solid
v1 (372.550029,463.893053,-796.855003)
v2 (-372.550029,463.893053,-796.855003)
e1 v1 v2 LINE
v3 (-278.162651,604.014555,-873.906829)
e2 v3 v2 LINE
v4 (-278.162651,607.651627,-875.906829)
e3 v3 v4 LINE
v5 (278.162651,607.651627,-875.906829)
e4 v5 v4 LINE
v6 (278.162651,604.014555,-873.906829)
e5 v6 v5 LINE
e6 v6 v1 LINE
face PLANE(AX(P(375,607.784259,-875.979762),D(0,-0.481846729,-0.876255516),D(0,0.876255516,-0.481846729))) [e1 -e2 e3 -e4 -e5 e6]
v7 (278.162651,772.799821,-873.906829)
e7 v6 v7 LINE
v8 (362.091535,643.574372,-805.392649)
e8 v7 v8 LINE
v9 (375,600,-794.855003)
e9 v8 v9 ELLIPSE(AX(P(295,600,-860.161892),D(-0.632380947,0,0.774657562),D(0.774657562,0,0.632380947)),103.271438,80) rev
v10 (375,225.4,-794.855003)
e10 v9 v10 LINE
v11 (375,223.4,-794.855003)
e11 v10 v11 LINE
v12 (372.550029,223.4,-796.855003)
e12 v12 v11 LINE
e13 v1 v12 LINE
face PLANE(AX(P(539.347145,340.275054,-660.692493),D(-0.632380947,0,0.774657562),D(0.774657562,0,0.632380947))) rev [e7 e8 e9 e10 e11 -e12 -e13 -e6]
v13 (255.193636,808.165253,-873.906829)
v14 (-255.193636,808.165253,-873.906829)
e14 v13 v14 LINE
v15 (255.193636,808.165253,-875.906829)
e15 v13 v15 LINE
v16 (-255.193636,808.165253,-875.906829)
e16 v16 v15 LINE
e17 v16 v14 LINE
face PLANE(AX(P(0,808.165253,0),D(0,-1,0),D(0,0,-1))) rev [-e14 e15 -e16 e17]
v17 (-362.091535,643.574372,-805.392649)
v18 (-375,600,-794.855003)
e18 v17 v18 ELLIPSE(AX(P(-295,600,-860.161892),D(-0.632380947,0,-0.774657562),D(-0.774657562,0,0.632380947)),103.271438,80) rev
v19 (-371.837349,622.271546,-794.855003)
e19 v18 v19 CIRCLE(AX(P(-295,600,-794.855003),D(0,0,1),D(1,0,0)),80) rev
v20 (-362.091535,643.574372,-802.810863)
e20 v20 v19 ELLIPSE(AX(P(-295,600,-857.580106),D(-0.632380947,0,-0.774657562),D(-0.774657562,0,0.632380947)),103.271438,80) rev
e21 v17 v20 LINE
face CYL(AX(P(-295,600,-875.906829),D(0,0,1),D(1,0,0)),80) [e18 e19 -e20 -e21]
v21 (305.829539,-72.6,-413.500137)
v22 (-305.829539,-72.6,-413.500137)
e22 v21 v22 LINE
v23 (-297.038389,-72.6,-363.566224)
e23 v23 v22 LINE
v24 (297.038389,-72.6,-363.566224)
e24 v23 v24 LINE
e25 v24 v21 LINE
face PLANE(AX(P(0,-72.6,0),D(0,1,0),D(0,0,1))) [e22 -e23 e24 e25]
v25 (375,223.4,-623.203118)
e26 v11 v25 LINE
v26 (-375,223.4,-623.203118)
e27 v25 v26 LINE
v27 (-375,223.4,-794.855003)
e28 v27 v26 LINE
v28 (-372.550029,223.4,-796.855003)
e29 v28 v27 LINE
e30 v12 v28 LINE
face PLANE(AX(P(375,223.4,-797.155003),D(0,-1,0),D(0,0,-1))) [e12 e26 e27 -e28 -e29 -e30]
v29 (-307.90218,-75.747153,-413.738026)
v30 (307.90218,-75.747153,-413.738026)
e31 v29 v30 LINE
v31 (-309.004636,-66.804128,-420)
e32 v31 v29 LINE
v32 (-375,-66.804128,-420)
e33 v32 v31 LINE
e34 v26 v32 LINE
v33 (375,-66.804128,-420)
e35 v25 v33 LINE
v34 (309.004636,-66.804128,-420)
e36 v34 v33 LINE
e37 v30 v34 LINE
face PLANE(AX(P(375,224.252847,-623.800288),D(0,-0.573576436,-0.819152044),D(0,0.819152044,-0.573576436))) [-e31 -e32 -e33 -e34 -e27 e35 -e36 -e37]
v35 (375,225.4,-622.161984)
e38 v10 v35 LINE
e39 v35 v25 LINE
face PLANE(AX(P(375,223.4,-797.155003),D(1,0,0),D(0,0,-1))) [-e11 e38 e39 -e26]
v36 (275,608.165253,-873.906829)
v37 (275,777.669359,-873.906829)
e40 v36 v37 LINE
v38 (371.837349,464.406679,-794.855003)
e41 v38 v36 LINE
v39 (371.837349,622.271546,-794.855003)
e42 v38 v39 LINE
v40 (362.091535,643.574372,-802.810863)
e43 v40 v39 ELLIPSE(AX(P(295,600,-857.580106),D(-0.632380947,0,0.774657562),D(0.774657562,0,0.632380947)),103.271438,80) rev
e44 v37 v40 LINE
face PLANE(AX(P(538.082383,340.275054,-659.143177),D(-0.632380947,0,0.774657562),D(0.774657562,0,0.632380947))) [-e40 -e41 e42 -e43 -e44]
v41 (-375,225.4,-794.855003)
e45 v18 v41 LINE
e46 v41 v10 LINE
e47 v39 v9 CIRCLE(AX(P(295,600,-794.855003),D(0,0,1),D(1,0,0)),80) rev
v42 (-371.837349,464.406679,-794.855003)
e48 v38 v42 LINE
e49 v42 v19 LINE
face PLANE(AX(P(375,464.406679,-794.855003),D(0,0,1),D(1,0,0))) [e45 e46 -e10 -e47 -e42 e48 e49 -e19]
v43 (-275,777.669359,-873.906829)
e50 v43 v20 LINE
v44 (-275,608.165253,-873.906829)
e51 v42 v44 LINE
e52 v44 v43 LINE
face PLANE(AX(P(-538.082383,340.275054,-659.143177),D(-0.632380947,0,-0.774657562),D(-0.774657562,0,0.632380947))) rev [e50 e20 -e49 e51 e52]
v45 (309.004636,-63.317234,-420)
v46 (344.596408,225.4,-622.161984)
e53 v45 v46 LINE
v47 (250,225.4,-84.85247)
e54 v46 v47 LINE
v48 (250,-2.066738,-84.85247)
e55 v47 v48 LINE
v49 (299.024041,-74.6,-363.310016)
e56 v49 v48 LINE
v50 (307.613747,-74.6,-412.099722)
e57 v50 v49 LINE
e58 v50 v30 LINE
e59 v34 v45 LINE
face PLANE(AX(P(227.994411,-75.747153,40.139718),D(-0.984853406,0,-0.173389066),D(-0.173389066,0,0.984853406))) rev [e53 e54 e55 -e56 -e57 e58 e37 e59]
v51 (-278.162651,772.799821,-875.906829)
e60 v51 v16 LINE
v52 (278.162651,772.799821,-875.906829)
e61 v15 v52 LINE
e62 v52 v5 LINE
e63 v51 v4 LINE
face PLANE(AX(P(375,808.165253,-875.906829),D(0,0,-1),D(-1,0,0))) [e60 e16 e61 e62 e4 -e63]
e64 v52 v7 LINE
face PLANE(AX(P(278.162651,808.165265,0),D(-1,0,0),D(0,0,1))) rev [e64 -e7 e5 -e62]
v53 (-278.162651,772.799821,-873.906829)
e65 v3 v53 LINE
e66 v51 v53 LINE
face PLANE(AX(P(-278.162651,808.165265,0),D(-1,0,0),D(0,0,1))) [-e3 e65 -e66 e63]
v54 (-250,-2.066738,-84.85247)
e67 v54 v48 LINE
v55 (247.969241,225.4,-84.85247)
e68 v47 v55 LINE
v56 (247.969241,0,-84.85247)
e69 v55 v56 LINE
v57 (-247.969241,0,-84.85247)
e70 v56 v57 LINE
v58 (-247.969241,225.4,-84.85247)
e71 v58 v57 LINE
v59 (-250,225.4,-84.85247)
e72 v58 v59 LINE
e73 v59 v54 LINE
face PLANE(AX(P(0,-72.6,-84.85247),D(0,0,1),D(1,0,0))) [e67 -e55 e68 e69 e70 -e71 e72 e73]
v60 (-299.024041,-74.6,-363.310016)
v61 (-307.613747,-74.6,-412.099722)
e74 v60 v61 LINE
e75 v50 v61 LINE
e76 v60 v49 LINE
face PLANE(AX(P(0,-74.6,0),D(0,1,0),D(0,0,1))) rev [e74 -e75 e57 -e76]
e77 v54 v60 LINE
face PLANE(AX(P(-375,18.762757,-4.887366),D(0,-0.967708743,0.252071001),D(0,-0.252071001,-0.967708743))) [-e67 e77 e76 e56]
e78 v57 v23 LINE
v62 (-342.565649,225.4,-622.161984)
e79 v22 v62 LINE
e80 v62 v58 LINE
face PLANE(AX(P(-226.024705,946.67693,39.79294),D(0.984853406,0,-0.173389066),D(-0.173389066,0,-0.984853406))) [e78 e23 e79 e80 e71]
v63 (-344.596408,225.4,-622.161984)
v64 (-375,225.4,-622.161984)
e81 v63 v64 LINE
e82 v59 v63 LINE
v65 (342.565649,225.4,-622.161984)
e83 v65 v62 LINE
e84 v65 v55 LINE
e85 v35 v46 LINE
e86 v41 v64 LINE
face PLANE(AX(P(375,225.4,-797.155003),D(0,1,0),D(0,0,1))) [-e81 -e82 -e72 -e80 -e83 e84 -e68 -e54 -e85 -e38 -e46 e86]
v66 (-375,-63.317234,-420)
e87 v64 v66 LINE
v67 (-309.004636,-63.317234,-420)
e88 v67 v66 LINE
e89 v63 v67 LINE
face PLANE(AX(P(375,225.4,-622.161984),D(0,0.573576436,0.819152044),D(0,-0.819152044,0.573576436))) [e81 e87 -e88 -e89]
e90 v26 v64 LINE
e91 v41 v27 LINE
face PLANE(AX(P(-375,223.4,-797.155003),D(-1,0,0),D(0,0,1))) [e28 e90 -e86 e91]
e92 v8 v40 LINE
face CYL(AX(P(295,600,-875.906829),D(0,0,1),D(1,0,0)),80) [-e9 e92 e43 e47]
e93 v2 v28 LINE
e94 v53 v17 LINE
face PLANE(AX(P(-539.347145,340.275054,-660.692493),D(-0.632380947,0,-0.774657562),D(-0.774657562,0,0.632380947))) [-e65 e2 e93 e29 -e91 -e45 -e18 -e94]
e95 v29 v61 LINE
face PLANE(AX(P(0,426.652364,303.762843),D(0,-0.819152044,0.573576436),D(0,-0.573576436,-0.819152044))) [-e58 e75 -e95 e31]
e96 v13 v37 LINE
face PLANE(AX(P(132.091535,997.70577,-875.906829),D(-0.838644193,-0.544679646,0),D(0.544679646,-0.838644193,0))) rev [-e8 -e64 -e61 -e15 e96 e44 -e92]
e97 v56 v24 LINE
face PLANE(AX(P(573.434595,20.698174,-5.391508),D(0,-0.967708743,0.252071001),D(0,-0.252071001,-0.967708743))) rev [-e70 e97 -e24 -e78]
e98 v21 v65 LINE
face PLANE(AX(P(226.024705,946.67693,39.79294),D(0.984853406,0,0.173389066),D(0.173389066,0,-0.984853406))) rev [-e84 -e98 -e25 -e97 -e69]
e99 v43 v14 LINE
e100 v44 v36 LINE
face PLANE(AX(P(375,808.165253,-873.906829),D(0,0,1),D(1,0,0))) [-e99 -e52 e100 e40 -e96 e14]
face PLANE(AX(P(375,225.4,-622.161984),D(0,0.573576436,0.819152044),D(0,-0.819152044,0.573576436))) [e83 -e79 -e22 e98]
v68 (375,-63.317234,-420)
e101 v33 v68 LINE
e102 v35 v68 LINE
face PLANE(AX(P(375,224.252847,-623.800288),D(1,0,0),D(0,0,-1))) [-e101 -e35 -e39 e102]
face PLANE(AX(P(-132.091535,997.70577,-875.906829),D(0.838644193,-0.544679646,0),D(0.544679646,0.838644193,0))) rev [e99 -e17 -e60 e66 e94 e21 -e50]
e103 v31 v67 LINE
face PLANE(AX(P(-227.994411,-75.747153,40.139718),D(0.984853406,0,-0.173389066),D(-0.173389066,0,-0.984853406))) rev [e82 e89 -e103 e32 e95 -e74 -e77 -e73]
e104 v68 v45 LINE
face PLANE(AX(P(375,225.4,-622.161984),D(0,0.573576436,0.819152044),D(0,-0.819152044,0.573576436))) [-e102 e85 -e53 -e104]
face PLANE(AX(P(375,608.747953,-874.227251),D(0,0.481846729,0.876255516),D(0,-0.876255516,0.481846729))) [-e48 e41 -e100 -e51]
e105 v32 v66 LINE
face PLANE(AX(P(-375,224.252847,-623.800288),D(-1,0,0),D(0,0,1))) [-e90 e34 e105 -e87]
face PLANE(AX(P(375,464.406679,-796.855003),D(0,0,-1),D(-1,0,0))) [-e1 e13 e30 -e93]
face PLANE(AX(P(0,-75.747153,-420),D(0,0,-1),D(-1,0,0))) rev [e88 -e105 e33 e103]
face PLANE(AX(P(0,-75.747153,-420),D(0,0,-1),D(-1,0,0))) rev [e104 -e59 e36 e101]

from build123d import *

# Parameters (mm, degrees)
SKETCH2_W                        = 750
SKETCH2_H                        = 2
CUT_EXTRUDE1_START               = -75.747152873
CUT_EXTRUDE1_DEPTH               = 12.429918895
BOSS_EXTRUDE8_DEPTH              = 2
BOSS_EXTRUDE9_REACH              = 1300.889
CUT_EXTRUDE2_DEPTH               = 1250.387389222
CUT_EXTRUDE2_DEPTH_BACK          = 1250.387389222
BOSS_EXTRUDE11_REACH             = 1244.792
CUT_EXTRUDE4_DEPTH               = 1243.792388557
CUT_EXTRUDE4_DEPTH_BACK          = 1243.792388557
SKETCH9_5_W                      = 96.83734937
SKETCH9_5_H                      = 2
CUT_EXTRUDE5_DEPTH               = 1250.387389222
CUT_EXTRUDE5_DEPTH_BACK          = 1250.387389222
BOSS_EXTRUDE12_REACH             = 1251.387
BOSS_EXTRUDE12_DIRECTION_2_REACH = 1251.387
CUT_EXTRUDE6_DEPTH               = 1250.387389222


# Read off the part's stored shape, not the designer's step: Cut-Extrude1
with BuildPart() as part:
    # Sweep1: sweep along a path in Sketch1
    with BuildLine(Plane(origin=(0, 0, 0), x_dir=(0, 0, -1), z_dir=(1, 0, 0))) as sweep1_path:
        Line((412.09972218, -74.6), (622.161983643, 225.4))
        Line((622.161983643, 225.4), (794.855002782, 225.4))
        Line((794.855002782, 225.4), (794.855002782, 464.406679147))
        Line((794.855002782, 464.406679147), (873.906828676, 608.165252796))
        Line((873.906828676, 608.165252796), (873.906828676, 808.165252796))
    # Sketch2 → Sweep1 (sweep)
    with BuildSketch(Plane(origin=(0, 808.165252796, -873.906828676), x_dir=(-1, 0, 0), z_dir=(0, -1, 0))):
        with Locations((0, 1)):
            Rectangle(SKETCH2_W, SKETCH2_H)
    sweep(path=sweep1_path.line, transition=Transition.RIGHT)

    # Cut-Extrude1 outline → Cut-Extrude1 (cut)
    with BuildSketch(Plane(origin=(0, 0, 0), x_dir=(1, 0, 0), z_dir=(0, 1, 0)).offset(CUT_EXTRUDE1_START)):
        Polygon((309.004636298, 420), (250, 84.852470497), (375, 84.852470497), (375, 420), align=None)
        Polygon((-375, 84.852470497), (-250, 84.852470497), (-309.004636298, 420), (-375, 420), align=None)
    extrude(amount=CUT_EXTRUDE1_DEPTH, mode=Mode.SUBTRACT)

    # Sketch5 → Boss-Extrude8 (add)
    with BuildSketch(Plane(origin=(0, -74.6, 0), x_dir=(1, 0, 0), z_dir=(0, 1, 0))):
        Polygon((250, 84.852470497), (307.902180066, 413.738026268), (-307.902180066, 413.738026268), (-250, 84.852470497), align=None)
    extrude(amount=BOSS_EXTRUDE8_DEPTH)

    # Boss-Extrude9: up to this face of the body (flat: up to its plane)
    boss_extrude9_end = Plane(part.part.faces().sort_by_distance((0, 225.4, -708.508493212))[0])
    # Sketch7 → Boss-Extrude9 (add, up to the picked face)
    with BuildSketch(Plane(origin=(0, -74.6, 0), x_dir=(1, 0, 0), z_dir=(0, 1, 0)), mode=Mode.PRIVATE) as boss_extrude9_sk1:
        Polygon((247.969240917, 84.852470497), (250, 84.852470497), (375, 794.855002782), (372.969240917, 794.855002782), align=None)
    boss_extrude9_tool1 = split(extrude(boss_extrude9_sk1.sketch, amount=BOSS_EXTRUDE9_REACH, mode=Mode.PRIVATE), bisect_by=boss_extrude9_end, keep=Keep.BOTH, mode=Mode.PRIVATE)
    # Sketch7 → Boss-Extrude9 (add, up to the picked face)
    with BuildSketch(Plane(origin=(0, -74.6, 0), x_dir=(1, 0, 0), z_dir=(0, 1, 0)), mode=Mode.PRIVATE) as boss_extrude9_sk2:
        Polygon((-250, 84.852470497), (-247.969240917, 84.852470497), (-372.969240917, 794.855002782), (-375, 794.855002782), align=None)
    boss_extrude9_tool2 = split(extrude(boss_extrude9_sk2.sketch, amount=BOSS_EXTRUDE9_REACH, mode=Mode.PRIVATE), bisect_by=boss_extrude9_end, keep=Keep.BOTH, mode=Mode.PRIVATE)
    add(boss_extrude9_tool1.solids().sort_by(Axis((311.48462, -74.6, -439.853737), (0, 1, 0)))[0])
    add(boss_extrude9_tool2.solids().sort_by(Axis((-311.48462, -74.6, -439.853737), (0, 1, 0)))[0])

    # Sketch8 → Cut-Extrude2 (cut, two sides: drawn at the far end of the back side and taken through both)
    with BuildSketch(Plane(origin=(0, 0, 0), x_dir=(0, 0, -1), z_dir=(1, 0, 0)).offset(-CUT_EXTRUDE2_DEPTH_BACK)):
        Polygon((794.855002782, -75.747152873), (413.738026268, -75.747152873), (623.203117744, 223.4), (794.855002782, 223.4), align=None)
    extrude(amount=CUT_EXTRUDE2_DEPTH + CUT_EXTRUDE2_DEPTH_BACK, mode=Mode.SUBTRACT)

    # Boss-Extrude11: up to this plane
    boss_extrude11_end = Plane(origin=(375, 608.747952644, -874.227251213), z_dir=(0, 0.48184672916330257, 0.8762555161564617))
    # Sketch9 → Boss-Extrude11 (add, up to the surface)
    with BuildSketch(Plane(origin=(0, 808.165252796, -873.906828676), x_dir=(-1, 0, 0), z_dir=(0, -1, 0)), mode=Mode.PRIVATE) as boss_extrude11_sk1:
        Polygon((278.16265063, 0), (375, -79.051825894), (371.837349371, -79.051825894), (275, 0), align=None)
    boss_extrude11_tool1 = split(extrude(boss_extrude11_sk1.sketch, amount=BOSS_EXTRUDE11_REACH, mode=Mode.PRIVATE), bisect_by=boss_extrude11_end, keep=Keep.BOTH, mode=Mode.PRIVATE)
    add(boss_extrude11_tool1.solids().sort_by_distance((-325, 808.165253, -834.380916))[0])
    # Sketch9 → Boss-Extrude11 (add, up to the surface)
    with BuildSketch(Plane(origin=(0, 808.165252796, -873.906828676), x_dir=(-1, 0, 0), z_dir=(0, -1, 0)), mode=Mode.PRIVATE) as boss_extrude11_sk2:
        Polygon((-278.16265063, 0), (-275, 0), (-371.837349371, -79.051825894), (-375, -79.051825894), align=None)
    boss_extrude11_tool2 = split(extrude(boss_extrude11_sk2.sketch, amount=BOSS_EXTRUDE11_REACH, mode=Mode.PRIVATE), bisect_by=boss_extrude11_end, keep=Keep.BOTH, mode=Mode.PRIVATE)
    add(boss_extrude11_tool2.solids().sort_by_distance((325, 808.165253, -834.380916))[0])

    # Sketch9<5> → Cut-Extrude4 (cut, two sides: drawn at the far end of the back side and taken through both)
    with BuildSketch(Plane(origin=(0, 808.165252796, -873.906828676), x_dir=(-1, 0, 0), z_dir=(0, -1, 0)).offset(-CUT_EXTRUDE4_DEPTH_BACK)):
        with Locations((326.581325315, 1)):
            Rectangle(SKETCH9_5_W, SKETCH9_5_H)
        Polygon((375, 0), (278.16265063, 0), (375, -79.051825894), align=None)
        with Locations((-326.581325315, 1)):
            Rectangle(SKETCH9_5_W, SKETCH9_5_H)
        Polygon((-278.16265063, 0), (-375, 0), (-375, -79.051825894), align=None)
    extrude(amount=CUT_EXTRUDE4_DEPTH + CUT_EXTRUDE4_DEPTH_BACK, mode=Mode.SUBTRACT)

    # Sketch10 → Cut-Extrude5 (cut, two sides: drawn at the far end of the back side and taken through both)
    with BuildSketch(Plane(origin=(0, 0, 0), x_dir=(0, 0, -1), z_dir=(1, 0, 0)).offset(-CUT_EXTRUDE5_DEPTH_BACK)):
        Polygon((363.31001592, -74.6), (84.852470497, -2.066737554), (84.852470497, -74.6), align=None)
    extrude(amount=CUT_EXTRUDE5_DEPTH + CUT_EXTRUDE5_DEPTH_BACK, mode=Mode.SUBTRACT)

    # Boss-Extrude12: up to this face of the body (flat: up to its plane)
    boss_extrude12_end = Plane(part.part.faces().sort_by_distance((290.698054418, 99.199933477, -316.018244063))[0])
    # Sketch10<3> → Boss-Extrude12 (add, up to the picked face)
    with BuildSketch(Plane(origin=(0, 0, 0), x_dir=(0, 0, -1), z_dir=(1, 0, 0)), mode=Mode.PRIVATE) as boss_extrude12_sk1:
        Polygon((371.244288377, -74.6), (84.852470497, 0), (84.852470497, -2.066737554), (363.31001592, -74.6), align=None)
    boss_extrude12_tool1 = split(extrude(boss_extrude12_sk1.sketch, amount=BOSS_EXTRUDE12_REACH, mode=Mode.PRIVATE), bisect_by=boss_extrude12_end, keep=Keep.BOTH, mode=Mode.PRIVATE)
    add(boss_extrude12_tool1.solids().sort_by(Axis((0, -37.814265, -226.074099), (1, 0, 0)))[0])

    # Boss-Extrude12 direction 2: up to this face of the body (flat: up to its plane)
    boss_extrude12_direction_2_end = Plane(part.part.faces().sort_by_distance((-290.698054418, 99.199933477, -316.018244063))[0])
    # Sketch10<3> → Boss-Extrude12 direction 2 (add, up to the picked face)
    with BuildSketch(Plane(origin=(0, 0, 0), x_dir=(0, 0, -1), z_dir=(1, 0, 0)), mode=Mode.PRIVATE) as boss_extrude12_direction_2_sk1:
        Polygon((371.244288377, -74.6), (84.852470497, 0), (84.852470497, -2.066737554), (363.31001592, -74.6), align=None)
    boss_extrude12_direction_2_tool1 = split(extrude(boss_extrude12_direction_2_sk1.sketch, amount=-BOSS_EXTRUDE12_DIRECTION_2_REACH, mode=Mode.PRIVATE), bisect_by=boss_extrude12_direction_2_end, keep=Keep.BOTH, mode=Mode.PRIVATE)
    add(boss_extrude12_direction_2_tool1.solids().sort_by(Axis((0, -37.814265, -226.074099), (-1, 0, 0)))[0])

    # Sketch11 → Cut-Extrude6 (cut, through all)
    with BuildSketch(Plane.XY):
        with BuildLine():
            Line((-132.091535468, 997.705769529), (-362.091535468, 643.574371694))
            ThreePointArc((-362.091535468, 643.574371694), (-371.70502864, 622.723084766), (-375, 600))
            Line((-375, 600), (-375, 997.705769529))
            Line((-375, 997.705769529), (-132.091535468, 997.705769529))
        make_face()
        with BuildLine():
            Line((132.091535468, 997.705769529), (362.091535468, 643.574371694))
            ThreePointArc((362.091535468, 643.574371694), (371.70502864, 622.723084766), (375, 600))
            Line((375, 600), (375, 997.705769529))
            Line((375, 997.705769529), (132.091535468, 997.705769529))
        make_face()
    extrude(amount=-CUT_EXTRUDE6_DEPTH, mode=Mode.SUBTRACT)


solid = part.part
